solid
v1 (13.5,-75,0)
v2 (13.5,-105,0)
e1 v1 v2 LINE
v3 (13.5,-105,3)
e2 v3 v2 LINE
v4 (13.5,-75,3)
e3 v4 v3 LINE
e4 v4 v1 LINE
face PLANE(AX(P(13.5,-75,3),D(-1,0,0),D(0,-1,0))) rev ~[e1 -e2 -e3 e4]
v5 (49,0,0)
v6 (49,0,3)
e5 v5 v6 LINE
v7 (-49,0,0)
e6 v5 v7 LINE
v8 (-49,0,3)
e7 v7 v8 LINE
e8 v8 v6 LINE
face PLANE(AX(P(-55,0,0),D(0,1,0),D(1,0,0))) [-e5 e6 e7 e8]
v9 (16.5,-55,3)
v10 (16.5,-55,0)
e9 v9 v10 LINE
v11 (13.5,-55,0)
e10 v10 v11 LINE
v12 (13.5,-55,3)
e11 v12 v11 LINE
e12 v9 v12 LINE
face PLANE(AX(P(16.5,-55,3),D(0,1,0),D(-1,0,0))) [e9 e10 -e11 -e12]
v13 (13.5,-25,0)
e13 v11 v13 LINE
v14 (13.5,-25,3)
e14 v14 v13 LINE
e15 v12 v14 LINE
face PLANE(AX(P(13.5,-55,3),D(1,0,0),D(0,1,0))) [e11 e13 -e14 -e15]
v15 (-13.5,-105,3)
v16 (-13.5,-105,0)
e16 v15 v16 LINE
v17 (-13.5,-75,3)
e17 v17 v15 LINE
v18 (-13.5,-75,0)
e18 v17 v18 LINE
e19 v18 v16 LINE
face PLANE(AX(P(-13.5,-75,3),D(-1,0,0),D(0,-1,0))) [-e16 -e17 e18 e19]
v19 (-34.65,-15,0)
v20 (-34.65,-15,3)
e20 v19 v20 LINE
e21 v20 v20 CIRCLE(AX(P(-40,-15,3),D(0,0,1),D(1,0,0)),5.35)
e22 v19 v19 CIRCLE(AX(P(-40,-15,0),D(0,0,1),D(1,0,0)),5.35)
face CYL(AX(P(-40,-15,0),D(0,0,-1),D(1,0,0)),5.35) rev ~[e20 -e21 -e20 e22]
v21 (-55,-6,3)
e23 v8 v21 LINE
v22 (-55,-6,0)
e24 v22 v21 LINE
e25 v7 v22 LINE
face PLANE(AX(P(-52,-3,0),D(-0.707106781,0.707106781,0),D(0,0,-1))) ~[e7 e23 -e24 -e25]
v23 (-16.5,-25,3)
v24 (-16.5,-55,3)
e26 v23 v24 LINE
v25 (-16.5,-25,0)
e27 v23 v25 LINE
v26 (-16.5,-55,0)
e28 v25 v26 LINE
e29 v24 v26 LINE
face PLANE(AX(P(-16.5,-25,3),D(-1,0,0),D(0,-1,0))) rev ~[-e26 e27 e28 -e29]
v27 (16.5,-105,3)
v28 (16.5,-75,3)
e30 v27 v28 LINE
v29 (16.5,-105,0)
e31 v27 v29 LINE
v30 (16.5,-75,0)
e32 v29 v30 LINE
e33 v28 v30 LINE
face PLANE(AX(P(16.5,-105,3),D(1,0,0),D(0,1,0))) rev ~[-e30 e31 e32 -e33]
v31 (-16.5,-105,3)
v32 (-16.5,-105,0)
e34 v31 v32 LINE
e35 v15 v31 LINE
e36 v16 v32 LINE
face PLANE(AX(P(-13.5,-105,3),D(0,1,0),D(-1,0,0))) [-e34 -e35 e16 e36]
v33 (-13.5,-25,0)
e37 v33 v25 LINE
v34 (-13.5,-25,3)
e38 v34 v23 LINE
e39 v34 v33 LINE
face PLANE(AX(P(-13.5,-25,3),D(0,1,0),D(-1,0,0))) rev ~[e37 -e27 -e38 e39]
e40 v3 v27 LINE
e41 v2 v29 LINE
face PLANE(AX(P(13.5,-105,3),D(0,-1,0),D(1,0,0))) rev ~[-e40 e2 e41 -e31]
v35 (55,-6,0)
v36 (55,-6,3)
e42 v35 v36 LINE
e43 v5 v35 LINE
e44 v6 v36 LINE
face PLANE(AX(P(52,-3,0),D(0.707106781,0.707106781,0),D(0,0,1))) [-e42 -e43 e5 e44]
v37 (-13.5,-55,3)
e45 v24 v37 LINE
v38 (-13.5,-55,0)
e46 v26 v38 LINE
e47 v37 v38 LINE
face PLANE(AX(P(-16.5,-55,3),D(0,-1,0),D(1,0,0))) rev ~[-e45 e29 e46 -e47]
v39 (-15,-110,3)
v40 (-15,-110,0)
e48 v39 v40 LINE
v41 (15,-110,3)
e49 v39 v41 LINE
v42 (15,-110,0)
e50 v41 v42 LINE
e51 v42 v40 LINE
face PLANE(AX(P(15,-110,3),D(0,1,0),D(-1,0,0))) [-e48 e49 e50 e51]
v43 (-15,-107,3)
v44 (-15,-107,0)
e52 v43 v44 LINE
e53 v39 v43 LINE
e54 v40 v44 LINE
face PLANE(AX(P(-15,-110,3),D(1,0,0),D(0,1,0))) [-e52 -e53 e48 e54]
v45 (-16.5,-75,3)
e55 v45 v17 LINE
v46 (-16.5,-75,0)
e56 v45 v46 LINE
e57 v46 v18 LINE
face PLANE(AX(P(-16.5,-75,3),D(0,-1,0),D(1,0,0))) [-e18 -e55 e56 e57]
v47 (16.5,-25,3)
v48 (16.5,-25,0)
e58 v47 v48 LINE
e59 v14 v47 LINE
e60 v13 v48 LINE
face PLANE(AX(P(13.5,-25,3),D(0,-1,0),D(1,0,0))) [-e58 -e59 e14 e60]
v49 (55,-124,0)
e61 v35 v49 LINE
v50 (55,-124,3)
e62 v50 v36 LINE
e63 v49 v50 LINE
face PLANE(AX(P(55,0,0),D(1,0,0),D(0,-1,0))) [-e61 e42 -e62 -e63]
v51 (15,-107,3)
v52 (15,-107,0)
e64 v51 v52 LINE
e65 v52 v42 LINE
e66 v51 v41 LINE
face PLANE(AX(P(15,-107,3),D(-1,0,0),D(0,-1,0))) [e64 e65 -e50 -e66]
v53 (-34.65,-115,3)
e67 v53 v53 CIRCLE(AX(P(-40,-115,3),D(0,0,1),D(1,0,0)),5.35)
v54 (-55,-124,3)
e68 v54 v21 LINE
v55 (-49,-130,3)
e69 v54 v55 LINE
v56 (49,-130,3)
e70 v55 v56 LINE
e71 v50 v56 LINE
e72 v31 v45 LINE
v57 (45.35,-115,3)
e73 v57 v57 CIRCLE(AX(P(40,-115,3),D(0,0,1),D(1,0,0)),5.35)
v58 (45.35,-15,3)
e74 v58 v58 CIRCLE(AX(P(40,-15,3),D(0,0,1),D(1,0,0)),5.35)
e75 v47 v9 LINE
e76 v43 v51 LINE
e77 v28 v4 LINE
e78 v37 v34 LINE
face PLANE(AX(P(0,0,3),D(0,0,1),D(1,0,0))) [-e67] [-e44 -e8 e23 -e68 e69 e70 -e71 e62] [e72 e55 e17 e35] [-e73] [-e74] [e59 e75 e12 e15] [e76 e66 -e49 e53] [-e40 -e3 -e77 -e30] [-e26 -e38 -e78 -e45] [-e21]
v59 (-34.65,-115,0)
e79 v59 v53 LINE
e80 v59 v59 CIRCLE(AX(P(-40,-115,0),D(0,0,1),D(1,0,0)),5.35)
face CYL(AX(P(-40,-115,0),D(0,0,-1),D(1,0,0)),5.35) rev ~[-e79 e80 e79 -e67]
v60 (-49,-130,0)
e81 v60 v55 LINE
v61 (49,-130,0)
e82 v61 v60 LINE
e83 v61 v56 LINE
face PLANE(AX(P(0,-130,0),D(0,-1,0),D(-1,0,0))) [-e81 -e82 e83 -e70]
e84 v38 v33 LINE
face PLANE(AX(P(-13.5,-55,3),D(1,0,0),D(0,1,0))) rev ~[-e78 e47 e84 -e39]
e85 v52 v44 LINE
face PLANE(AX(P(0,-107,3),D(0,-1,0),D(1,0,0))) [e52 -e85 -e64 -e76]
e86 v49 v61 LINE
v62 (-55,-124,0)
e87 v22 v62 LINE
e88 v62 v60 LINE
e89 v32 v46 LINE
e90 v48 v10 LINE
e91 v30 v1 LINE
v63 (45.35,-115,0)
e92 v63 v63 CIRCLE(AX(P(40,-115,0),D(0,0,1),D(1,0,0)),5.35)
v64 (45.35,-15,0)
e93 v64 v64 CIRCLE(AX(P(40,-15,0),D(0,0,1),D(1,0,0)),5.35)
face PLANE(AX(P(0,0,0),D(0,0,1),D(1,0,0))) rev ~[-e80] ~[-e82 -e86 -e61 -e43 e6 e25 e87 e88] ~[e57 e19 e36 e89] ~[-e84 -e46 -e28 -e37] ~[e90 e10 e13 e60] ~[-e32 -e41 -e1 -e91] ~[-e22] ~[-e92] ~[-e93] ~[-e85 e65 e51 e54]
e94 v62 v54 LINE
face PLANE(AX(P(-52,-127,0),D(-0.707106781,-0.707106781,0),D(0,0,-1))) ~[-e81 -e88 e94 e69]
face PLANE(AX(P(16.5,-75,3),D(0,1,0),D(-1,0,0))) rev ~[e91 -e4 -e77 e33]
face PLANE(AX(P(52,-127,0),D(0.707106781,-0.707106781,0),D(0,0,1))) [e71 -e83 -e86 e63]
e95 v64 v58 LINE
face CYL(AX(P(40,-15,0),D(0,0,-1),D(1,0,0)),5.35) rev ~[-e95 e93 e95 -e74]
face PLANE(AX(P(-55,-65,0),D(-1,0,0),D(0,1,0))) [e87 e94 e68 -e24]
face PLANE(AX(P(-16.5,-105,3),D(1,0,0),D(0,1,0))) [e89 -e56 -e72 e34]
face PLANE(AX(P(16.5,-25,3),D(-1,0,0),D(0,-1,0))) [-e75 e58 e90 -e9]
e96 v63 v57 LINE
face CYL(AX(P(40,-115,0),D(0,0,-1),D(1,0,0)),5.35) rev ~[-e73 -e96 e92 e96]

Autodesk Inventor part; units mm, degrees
ref_plane "YZ Plane" through (0, 0, 0) normal (1, 0, 0) x (0, 1, 0)
ref_plane "XZ Plane" through (0, 0, 0) normal (0, 1, 0) x (-1, 0, 0)
ref_plane "XY Plane" through (0, 0, 0) normal (0, 0, 1) x (1, 0, 0)
sketch "Sketch1" plane through (0, 0, 0) normal (0, 0, 1) x (1, 0, 0)
  line L0 (-55, 0) -> (55, 0)
  line L1 (55, 0) -> (55, -130)
  line L2 (55, -130) -> (-55, -130)
  line L3 (-55, -130) -> (-55, 0)
  line L4 (0, 0) -> (0, -130)
  line L5 (-55, -65) -> (55, -65)
  circle A0 centre (40, -15) radius 5.35
  line L6 (55, -65) -> (-55, -65)
  circle A1 centre (-40, -15) radius 5.35
  circle A2 centre (40, -115) radius 5.35
  circle A3 centre (-40, -115) radius 5.35
  dimension "d0" = 110
  dimension "d1" = 130
  dimension "d2" = 10.7
  dimension "d3" = 40
  dimension "d4" = 50
extrude "Plate1" add sketch "Sketch1" along normal blind 3
sketch "Sketch2" plane through (0, 0, 3) normal (0, 0, 1) x (1, 0, 0)
  line L0 (13.5, -25) -> (16.5, -25)
  line L1 (16.5, -25) -> (16.5, -55)
  line L2 (16.5, -55) -> (13.5, -55)
  line L3 (13.5, -55) -> (13.5, -25)
  line L4 (0, 0) -> (0, -130)
  line L5 (-55, -130) -> (55, -130) projected
  line L6 (-55, 0) -> (55, 0) projected
  line L7 (-55, 0) -> (-55, -130) projected
  line L8 (-55, -65) -> (55, -65)
  line L9 (55, -130) -> (55, 0) projected
  line L10 (13.5, -105) -> (16.5, -105)
  line L11 (16.5, -105) -> (16.5, -75)
  line L12 (16.5, -75) -> (13.5, -75)
  line L13 (13.5, -75) -> (13.5, -105)
  line L14 (-13.5, -25) -> (-16.5, -25)
  line L15 (-16.5, -25) -> (-16.5, -55)
  line L16 (-16.5, -55) -> (-13.5, -55)
  line L17 (-13.5, -55) -> (-13.5, -25)
  line L18 (-13.5, -75) -> (-13.5, -105)
  line L19 (-16.5, -105) -> (-16.5, -75)
  line L20 (-13.5, -105) -> (-16.5, -105)
  line L21 (-16.5, -75) -> (-13.5, -75)
  line L22 (-15, -107) -> (15, -107)
  line L23 (15, -107) -> (15, -110)
  line L24 (15, -110) -> (-15, -110)
  line L25 (-15, -110) -> (-15, -107)
  point P0 (13.5, -40)
  point P1 (15, -25)
  point P2 (-15, -108.5)
  dimension "d6" = 3
  dimension "d7" = 30
  dimension "d8" = 13.5
  dimension "d9" = 25
  dimension "d10" = 30
  dimension "d11" = 3
  dimension "d12" = 15
  dimension "d13" = 20
extrude "Cut1" cut sketch "Sketch2" against normal blind 3 contours L0 L1 L2 L3 | L22 L23 L24 L4 | L4 L24 L25 L22 | L13 L12 L11 L10 | L17 L16 L15 L14 | L18 L20 L19 L21
chamfer "Corner Chamfer1" distance 6 angle 45 4 edges at (55, 0, 1.5) (-55, 0, 1.5) (-55, -130, 1.5) (55, -130, 1.5)
equation "\"d6\" = plate_thickness"
equation "\"d8\" = 0.5 * L_Piston_Bottom + A_joint_tolerance"
equation "\"d11\" = plate_thickness"
equation "\"d14\" = Thickness"
equation "\"d5\" = Thickness"
equation "\"Thickness\" = plate_thickness"
equation "\"BendRadius\" = Thickness"
equation "\"BendReliefWidth\" = Thickness"
equation "\"BendReliefDepth\" = 0.5 * Thickness"
equation "\"CornerReliefSize\" = 4 * Thickness"
equation "\"MinimumRemnant\" = 2 * Thickness"
equation "\"TransitionRadius\" = BendRadius"
equation "\"JacobiRadiusSize\" = BendRadius"
equation "\"GapSize\" = Thickness"
equation "\"A_width\" = 46"
equation "\"A_joint_diameter\" = 16"
equation "\"A_joint_tolerance\" = 3"
equation "\"l___________\" = 0"
equation "\"l__________\" = 0"
equation "\"l_________\" = 0"
equation "\"rivet_diameter\" = 3.35"
equation "\"plate_thickness\" = 3"
equation "\"l________\" = 0"
equation "\"L_Piston_Bottom\" = 21"
equation "\"L_Piston_Top\" = 25"
equation "\"A_B_spacing\" = 2"
equation "\"thin_plate\" = 1.5"
properties part number "Piston_FloorHinge_BasePlate" material "Stainless Steel"
